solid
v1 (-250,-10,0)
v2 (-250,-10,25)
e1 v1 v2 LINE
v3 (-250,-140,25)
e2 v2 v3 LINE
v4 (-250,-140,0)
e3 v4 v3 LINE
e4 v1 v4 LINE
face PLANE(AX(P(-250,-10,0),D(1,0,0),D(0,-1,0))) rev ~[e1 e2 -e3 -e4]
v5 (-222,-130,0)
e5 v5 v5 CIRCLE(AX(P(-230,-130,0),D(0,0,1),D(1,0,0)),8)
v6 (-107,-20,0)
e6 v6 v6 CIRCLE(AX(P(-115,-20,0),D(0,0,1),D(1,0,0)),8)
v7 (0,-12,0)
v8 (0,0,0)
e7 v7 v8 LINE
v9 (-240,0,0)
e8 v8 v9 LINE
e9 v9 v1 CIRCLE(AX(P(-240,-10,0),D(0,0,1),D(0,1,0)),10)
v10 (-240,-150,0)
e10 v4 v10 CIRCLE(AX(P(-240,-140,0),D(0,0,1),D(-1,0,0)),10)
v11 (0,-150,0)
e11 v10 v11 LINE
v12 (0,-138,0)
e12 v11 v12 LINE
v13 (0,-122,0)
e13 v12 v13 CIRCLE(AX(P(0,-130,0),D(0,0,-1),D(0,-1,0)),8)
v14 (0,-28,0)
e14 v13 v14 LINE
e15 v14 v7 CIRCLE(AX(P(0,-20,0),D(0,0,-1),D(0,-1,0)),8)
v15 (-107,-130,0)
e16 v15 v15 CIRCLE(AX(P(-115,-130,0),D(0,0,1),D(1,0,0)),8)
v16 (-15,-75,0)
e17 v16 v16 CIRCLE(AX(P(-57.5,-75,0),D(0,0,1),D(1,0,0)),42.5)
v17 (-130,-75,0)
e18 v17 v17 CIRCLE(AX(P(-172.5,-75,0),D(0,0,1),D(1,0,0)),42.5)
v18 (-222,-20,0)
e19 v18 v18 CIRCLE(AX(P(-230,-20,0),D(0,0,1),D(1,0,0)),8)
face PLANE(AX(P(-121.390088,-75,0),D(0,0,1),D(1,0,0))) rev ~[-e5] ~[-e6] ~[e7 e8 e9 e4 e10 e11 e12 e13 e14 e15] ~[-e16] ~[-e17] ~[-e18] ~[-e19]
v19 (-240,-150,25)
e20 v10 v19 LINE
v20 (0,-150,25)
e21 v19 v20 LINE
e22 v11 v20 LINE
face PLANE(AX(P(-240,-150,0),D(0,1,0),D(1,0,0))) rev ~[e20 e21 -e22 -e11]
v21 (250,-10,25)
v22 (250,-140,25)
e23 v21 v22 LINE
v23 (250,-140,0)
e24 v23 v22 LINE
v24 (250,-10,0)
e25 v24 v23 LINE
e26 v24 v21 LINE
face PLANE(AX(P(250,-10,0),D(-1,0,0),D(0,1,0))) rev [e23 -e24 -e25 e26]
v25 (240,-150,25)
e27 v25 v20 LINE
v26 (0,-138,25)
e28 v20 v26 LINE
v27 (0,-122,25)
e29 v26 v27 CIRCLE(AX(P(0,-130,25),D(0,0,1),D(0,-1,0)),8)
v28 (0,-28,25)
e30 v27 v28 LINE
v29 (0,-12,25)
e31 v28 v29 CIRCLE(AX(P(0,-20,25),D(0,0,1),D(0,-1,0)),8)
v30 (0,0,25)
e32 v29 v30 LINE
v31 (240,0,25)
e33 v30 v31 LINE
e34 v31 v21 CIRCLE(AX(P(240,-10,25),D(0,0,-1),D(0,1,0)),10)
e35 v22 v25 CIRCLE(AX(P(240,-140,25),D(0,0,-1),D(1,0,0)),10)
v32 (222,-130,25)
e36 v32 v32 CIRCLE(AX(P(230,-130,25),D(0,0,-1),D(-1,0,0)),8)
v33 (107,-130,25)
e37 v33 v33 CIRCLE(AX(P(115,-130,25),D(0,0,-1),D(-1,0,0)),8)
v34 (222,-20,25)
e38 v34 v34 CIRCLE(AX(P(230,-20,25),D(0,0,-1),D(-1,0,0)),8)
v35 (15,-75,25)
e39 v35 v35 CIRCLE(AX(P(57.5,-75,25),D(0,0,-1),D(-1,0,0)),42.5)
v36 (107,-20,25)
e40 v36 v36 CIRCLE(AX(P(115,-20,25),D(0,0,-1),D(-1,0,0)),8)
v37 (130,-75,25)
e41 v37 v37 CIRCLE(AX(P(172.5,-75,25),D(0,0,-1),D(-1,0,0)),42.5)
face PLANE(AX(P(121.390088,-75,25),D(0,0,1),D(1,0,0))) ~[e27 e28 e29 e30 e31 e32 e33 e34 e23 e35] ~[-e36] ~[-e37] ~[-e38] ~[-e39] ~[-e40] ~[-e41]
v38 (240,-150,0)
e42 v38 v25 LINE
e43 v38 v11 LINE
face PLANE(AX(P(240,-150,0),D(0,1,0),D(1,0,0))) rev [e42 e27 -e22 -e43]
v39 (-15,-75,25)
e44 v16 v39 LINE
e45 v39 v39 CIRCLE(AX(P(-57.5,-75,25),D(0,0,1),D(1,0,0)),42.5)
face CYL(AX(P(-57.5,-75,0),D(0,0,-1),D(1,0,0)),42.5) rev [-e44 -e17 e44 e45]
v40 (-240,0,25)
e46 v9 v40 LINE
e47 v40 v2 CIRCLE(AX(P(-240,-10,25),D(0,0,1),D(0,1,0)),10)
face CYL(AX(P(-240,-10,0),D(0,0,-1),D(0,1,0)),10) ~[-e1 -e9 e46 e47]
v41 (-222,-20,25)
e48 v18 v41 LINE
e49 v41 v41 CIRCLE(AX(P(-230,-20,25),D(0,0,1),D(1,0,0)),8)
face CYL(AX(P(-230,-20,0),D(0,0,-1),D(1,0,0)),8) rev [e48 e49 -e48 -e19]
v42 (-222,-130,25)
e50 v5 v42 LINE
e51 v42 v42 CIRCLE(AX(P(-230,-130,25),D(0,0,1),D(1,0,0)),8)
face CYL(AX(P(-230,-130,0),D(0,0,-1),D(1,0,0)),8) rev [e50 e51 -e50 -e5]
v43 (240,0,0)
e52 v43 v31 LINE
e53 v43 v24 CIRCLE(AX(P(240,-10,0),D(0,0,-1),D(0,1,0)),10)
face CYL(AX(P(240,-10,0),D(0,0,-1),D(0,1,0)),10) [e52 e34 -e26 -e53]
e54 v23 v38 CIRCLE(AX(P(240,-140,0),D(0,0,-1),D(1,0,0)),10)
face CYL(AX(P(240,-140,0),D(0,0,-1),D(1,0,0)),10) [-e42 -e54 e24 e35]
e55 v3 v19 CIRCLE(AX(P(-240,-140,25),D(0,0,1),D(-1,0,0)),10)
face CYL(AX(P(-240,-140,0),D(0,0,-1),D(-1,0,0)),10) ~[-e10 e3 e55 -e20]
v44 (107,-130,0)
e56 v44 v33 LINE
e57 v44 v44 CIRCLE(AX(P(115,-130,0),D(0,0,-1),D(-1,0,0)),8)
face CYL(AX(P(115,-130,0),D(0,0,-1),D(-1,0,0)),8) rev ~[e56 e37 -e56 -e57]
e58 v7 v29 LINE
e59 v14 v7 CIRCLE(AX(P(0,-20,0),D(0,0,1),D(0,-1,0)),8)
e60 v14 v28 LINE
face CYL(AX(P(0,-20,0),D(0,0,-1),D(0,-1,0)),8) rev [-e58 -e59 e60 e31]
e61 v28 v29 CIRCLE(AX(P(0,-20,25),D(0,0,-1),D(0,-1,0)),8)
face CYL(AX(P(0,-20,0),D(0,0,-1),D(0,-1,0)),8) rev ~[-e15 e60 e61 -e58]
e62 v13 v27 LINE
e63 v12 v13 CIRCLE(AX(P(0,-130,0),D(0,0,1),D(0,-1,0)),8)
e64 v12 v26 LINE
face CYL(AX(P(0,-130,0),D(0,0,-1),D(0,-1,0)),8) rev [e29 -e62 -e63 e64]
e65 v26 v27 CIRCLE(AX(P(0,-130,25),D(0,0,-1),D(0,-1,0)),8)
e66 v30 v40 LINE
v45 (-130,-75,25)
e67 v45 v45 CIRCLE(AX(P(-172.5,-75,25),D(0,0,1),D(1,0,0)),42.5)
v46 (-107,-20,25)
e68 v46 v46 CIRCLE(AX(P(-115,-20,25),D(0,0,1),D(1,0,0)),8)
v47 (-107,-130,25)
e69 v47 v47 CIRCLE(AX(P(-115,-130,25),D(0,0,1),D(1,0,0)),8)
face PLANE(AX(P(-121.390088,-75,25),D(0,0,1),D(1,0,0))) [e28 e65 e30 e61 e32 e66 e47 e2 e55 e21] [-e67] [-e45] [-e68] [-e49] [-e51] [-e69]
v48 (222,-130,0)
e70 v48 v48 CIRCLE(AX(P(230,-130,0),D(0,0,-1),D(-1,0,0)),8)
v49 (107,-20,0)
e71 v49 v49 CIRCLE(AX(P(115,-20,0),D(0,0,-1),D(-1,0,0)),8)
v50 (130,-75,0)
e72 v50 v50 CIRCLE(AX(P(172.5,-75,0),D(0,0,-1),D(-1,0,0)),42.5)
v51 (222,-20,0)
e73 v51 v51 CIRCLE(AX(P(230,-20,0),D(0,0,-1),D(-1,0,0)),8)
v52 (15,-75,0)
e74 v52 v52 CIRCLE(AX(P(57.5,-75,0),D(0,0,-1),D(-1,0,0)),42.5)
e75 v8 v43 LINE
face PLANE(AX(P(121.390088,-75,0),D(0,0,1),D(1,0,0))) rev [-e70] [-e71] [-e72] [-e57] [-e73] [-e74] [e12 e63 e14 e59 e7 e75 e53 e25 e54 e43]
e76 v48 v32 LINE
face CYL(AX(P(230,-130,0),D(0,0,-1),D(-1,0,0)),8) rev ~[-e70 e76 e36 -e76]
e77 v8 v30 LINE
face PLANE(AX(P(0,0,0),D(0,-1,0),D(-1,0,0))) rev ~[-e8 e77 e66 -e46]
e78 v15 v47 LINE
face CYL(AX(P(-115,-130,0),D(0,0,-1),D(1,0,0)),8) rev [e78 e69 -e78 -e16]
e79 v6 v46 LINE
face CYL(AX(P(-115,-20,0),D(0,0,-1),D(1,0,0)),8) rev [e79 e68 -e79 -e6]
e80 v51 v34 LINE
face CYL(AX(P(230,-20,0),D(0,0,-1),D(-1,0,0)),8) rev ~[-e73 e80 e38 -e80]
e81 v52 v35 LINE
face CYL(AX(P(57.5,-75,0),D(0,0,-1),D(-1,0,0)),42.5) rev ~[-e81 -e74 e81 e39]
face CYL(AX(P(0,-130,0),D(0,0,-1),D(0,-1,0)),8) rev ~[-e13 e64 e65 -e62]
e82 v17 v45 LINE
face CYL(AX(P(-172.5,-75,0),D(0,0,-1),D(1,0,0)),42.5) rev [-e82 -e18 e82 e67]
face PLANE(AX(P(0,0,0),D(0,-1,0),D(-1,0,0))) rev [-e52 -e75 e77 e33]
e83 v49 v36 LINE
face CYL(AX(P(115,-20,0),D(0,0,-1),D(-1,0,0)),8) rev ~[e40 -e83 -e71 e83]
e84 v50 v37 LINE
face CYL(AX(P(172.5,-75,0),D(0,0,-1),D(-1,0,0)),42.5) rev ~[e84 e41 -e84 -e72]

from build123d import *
from build123d import SkipClean  # not in build123d's __all__

# Parameters (mm, degrees)
F2_R     = 8
F2_R_2   = 42.5
F0_DEPTH = 25


with BuildPart() as f0:
    # F2 (on Top) → F0 (new body)
    with BuildSketch(Plane.XY):
        with BuildLine():
            Line((0, -12), (0, 0))
            Line((0, 0), (-240, 0))
            ThreePointArc((-240, 0), (-247.0710678119, -2.9289321881), (-250, -10))
            Line((-250, -10), (-250, -140))
            ThreePointArc((-250, -140), (-247.0710678119, -147.0710678119), (-240, -150))
            Line((-240, -150), (0, -150))
            Line((0, -150), (0, -138))
            ThreePointArc((0, -138), (-8, -130), (0, -122))
            Line((0, -122), (0, -28))
            ThreePointArc((0, -28), (-8, -20), (0, -12))
        make_face()
        with Locations((-230, -130)):
            Circle(F2_R, mode=Mode.SUBTRACT)
        with Locations((-115, -130)):
            Circle(F2_R, mode=Mode.SUBTRACT)
        with Locations((-172.5, -75)):
            Circle(F2_R_2, mode=Mode.SUBTRACT)
        with Locations((-230, -20)):
            Circle(F2_R, mode=Mode.SUBTRACT)
        with Locations((-57.5, -75)):
            Circle(F2_R_2, mode=Mode.SUBTRACT)
        with Locations((-115, -20)):
            Circle(F2_R, mode=Mode.SUBTRACT)
    extrude(amount=F0_DEPTH)

    # F1: F0 across face


with BuildPart() as f0_1:
    add(f0.part, clean=False)
    with SkipClean():  # cleaning this boolean's faces spoils the solid; the shape is the same uncleaned
        add(f0.part.mirror(Plane(origin=(0, -75, 12.5), x_dir=(0, 1, 0), z_dir=(1, 0, 0))), clean=False)


solid = f0_1.part
